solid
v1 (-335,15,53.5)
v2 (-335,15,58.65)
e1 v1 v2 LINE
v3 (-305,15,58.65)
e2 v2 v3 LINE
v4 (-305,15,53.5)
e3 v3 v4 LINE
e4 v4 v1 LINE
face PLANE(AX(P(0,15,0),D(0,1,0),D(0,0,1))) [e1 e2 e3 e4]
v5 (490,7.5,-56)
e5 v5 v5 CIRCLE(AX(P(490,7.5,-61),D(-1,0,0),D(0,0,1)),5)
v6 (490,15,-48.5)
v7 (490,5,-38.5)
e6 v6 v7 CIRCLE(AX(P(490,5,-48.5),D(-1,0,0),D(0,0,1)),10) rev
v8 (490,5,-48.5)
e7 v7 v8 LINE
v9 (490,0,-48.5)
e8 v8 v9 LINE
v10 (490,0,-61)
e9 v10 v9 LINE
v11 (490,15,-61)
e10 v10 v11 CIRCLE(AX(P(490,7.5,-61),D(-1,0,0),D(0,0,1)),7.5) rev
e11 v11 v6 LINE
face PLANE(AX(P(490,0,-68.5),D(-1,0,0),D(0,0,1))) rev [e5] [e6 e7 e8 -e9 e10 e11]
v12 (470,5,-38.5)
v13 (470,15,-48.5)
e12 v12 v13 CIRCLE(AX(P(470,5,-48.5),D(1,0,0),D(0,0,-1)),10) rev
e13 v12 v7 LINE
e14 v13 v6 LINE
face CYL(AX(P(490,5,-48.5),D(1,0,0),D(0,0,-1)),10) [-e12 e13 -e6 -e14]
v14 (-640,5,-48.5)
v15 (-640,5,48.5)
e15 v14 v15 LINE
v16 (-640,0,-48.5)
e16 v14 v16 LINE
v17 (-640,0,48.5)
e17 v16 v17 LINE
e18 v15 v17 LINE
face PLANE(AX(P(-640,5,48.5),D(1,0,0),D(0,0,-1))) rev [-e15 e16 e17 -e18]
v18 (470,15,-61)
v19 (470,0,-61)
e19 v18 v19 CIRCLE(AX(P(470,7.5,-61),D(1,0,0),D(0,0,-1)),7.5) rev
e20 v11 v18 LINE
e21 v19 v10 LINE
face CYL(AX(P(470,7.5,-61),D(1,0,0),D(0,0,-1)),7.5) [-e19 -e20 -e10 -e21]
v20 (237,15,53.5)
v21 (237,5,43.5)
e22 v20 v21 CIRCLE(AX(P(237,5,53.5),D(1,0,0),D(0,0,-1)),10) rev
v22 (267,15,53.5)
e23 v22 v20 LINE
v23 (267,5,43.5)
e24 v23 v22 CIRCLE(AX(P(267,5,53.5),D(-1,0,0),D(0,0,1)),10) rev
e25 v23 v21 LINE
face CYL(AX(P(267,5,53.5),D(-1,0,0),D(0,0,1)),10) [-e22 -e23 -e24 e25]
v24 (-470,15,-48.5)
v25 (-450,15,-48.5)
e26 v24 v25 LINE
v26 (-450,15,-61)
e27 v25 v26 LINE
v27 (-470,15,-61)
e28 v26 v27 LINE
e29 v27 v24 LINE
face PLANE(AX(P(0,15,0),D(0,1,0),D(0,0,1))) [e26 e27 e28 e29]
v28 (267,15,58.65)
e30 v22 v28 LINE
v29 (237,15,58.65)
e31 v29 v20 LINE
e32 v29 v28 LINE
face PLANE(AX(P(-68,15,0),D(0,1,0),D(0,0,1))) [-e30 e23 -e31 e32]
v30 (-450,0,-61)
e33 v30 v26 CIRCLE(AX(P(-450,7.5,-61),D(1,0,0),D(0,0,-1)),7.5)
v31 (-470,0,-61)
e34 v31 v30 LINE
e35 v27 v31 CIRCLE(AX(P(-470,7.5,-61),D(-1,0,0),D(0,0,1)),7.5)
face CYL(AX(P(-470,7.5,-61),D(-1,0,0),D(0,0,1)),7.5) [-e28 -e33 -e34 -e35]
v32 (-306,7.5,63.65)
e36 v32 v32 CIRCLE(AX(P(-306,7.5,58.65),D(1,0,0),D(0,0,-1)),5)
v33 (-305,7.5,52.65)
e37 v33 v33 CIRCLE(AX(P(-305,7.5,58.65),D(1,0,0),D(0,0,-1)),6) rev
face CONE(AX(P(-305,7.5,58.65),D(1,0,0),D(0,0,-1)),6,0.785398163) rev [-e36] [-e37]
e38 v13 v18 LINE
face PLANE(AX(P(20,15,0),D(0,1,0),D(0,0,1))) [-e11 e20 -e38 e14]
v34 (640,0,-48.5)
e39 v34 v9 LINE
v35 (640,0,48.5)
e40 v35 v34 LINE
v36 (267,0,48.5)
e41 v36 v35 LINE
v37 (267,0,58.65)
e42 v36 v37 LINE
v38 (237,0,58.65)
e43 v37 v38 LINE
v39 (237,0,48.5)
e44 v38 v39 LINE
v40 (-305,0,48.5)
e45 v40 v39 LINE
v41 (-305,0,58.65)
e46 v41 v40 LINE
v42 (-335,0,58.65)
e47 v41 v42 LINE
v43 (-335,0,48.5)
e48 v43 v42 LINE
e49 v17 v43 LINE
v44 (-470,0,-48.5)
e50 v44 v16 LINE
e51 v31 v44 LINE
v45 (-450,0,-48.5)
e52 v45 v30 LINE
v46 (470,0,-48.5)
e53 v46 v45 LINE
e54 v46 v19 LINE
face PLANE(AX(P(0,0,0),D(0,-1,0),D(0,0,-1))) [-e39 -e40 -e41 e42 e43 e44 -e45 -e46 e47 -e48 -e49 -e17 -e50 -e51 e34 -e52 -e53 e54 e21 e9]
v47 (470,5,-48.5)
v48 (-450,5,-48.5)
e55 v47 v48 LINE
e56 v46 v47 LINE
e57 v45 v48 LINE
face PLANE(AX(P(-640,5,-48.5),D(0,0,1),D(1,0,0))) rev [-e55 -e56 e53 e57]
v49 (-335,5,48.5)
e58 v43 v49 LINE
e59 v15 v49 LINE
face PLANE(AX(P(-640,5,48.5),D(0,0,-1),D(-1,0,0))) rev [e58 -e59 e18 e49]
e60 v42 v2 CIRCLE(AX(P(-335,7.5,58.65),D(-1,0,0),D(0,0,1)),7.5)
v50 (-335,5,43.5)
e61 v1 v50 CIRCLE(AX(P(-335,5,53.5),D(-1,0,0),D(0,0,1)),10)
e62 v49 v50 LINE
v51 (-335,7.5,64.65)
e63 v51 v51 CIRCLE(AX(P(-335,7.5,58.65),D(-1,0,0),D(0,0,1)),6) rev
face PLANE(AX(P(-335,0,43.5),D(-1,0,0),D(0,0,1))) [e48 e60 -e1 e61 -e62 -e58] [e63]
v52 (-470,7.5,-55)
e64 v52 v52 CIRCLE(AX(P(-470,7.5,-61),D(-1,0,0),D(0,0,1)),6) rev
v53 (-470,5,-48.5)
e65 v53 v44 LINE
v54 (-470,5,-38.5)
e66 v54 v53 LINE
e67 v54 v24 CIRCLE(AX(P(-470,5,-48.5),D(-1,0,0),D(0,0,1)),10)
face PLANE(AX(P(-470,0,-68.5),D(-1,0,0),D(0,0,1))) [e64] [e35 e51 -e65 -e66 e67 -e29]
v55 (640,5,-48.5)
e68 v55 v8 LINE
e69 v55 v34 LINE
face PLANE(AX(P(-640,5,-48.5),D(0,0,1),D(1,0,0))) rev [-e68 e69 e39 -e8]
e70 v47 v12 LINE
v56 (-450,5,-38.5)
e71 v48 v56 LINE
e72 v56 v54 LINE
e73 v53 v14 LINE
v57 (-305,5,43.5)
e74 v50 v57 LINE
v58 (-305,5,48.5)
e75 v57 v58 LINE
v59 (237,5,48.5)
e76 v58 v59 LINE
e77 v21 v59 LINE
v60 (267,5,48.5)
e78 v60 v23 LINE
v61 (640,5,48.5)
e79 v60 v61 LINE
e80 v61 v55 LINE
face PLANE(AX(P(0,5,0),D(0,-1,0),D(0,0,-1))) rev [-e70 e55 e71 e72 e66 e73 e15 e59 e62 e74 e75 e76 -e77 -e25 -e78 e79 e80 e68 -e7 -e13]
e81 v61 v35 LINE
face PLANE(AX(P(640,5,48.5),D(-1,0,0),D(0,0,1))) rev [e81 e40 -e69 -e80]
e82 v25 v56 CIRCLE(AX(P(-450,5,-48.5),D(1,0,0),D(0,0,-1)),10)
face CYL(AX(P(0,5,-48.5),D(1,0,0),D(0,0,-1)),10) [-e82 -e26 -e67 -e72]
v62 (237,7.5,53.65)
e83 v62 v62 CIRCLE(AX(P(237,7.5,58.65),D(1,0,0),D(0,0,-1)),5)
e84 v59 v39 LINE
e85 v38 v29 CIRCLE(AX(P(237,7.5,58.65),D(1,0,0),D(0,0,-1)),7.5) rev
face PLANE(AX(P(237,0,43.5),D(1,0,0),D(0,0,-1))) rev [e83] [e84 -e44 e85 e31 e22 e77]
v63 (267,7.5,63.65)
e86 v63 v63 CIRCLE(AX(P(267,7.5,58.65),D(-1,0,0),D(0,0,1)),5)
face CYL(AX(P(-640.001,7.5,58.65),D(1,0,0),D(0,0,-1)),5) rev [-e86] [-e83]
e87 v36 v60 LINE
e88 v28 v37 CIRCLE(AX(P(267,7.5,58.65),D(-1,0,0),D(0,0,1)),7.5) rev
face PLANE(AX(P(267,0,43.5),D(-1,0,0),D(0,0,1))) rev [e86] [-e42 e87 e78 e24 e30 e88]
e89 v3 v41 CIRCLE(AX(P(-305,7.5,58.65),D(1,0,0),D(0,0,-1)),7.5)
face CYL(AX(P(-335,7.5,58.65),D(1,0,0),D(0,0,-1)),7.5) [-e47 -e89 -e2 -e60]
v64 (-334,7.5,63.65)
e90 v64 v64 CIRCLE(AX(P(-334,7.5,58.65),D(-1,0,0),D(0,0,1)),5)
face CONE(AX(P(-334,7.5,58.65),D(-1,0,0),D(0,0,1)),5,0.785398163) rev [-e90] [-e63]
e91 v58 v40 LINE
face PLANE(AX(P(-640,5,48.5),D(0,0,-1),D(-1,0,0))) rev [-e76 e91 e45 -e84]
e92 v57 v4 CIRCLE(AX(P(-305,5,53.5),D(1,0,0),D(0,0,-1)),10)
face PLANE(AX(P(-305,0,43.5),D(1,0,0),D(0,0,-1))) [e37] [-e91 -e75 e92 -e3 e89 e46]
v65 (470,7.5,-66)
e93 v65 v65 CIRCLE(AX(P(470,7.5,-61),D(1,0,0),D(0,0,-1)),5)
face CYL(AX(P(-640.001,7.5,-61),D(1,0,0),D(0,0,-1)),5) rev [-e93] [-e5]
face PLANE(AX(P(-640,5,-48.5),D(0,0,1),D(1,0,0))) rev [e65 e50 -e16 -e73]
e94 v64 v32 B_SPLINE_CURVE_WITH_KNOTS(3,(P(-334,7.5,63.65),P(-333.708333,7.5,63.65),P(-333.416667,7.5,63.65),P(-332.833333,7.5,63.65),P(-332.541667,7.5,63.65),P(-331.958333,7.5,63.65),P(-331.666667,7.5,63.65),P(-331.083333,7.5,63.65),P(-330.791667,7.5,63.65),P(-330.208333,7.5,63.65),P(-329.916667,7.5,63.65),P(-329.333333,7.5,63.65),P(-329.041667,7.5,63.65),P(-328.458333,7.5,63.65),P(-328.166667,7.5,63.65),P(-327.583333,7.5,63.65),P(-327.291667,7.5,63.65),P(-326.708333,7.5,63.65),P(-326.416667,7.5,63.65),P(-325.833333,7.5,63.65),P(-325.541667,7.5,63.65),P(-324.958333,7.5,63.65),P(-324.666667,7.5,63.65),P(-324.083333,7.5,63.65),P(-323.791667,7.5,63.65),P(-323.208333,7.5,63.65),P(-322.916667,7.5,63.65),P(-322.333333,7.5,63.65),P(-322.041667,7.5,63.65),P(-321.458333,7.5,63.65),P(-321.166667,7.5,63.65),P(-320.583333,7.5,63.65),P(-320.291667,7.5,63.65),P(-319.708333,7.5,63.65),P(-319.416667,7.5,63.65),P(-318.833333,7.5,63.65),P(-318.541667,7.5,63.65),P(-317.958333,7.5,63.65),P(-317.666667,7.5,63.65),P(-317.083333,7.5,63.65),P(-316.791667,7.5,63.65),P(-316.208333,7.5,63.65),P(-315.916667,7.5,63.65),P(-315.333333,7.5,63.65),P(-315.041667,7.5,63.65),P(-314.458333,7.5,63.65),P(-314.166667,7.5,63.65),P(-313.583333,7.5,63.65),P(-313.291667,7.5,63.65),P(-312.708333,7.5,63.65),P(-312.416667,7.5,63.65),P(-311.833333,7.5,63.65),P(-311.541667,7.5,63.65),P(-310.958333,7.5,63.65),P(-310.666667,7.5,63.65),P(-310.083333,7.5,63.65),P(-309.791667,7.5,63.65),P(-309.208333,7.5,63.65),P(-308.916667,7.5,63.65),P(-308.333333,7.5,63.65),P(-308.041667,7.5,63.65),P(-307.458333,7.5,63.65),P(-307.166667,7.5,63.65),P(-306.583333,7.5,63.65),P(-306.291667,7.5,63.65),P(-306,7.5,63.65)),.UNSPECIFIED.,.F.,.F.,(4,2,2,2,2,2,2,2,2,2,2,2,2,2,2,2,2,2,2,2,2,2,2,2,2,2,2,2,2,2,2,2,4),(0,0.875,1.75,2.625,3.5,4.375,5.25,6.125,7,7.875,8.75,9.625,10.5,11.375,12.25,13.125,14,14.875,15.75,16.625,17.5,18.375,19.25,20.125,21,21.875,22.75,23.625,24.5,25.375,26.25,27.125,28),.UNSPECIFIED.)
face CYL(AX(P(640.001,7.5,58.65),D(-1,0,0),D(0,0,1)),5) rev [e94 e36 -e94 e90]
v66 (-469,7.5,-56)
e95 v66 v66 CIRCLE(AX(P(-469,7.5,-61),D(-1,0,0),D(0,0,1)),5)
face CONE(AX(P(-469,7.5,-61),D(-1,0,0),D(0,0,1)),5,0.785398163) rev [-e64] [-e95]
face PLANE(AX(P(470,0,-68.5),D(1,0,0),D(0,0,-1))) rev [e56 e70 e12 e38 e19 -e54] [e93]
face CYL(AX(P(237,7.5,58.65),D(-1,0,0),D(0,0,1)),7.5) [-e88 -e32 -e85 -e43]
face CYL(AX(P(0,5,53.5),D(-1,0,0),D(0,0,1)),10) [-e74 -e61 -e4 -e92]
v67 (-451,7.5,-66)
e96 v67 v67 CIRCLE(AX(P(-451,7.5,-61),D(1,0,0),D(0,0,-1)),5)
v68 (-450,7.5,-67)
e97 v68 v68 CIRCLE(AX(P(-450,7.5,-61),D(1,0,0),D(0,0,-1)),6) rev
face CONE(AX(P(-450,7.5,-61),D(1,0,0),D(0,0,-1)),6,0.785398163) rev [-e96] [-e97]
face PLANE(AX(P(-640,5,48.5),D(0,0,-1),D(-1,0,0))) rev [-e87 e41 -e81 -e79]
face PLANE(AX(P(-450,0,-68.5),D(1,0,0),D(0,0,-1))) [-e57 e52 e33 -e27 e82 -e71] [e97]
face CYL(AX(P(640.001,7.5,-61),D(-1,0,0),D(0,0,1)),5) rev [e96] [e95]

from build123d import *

# Parameters (mm, degrees)
SZKIC1_W                          = 1280
SZKIC1_H                          = 97
DODANIE_WYCI_GNI_CIE1_DEPTH       = 5
DODANIE_WYCI_GNI_CIE2_START       = -5
SZKIC2_W                          = 20
SZKIC2_H                          = 30
DODANIE_WYCI_GNI_CIE2_DEPTH       = 15
ZAOKR_GLENIE2_RADIUS              = 7.5
ZAOKR_GLENIE2_LENGTH              = 20
WYTNIJ_WYCI_GNI_CIE1_REACH        = 1114.213
SZKIC3_R                          = 5
DODANIE_WYCI_GNI_CIE3_START       = -5
SZKIC4_W                          = 30
SZKIC4_H                          = 22.65
DODANIE_WYCI_GNI_CIE3_DEPTH       = 15
ZAOKR_GLENIE3_R                   = 10
ZAOKR_GLENIE4_RADIUS              = 7.5
ZAOKR_GLENIE4_LENGTH              = 30
WYTNIJ_WYCI_GNI_CIE2_REACH        = 979.518
SZKIC5_R                          = 5
SFAZOWANIE1_SIZE                  = 1
ZAOKR_GLENIE5_R                   = 10
ZAOKR_GLENIE4_OF_LUSTRO2_2_RADIUS = 7.5
ZAOKR_GLENIE4_OF_LUSTRO2_2_LENGTH = 30
ZAOKR_GLENIE5_OF_LUSTRO2_R        = 10
ZAOKR_GLENIE2_OF_LUSTRO3_2_RADIUS = 7.5
ZAOKR_GLENIE2_OF_LUSTRO3_2_LENGTH = 20
ZAOKR_GLENIE3_OF_LUSTRO3_R        = 10


with BuildPart() as part:
    # Szkic1 → Dodanie-wyciągnięcie1 (new body)
    with BuildSketch(Plane(origin=(0, 0, 0), x_dir=(1, 0, 0), z_dir=(0, 1, 0))):
        Rectangle(SZKIC1_W, SZKIC1_H)
    extrude(amount=DODANIE_WYCI_GNI_CIE1_DEPTH)

    # Szkic2 → Dodanie-wyciągnięcie2 (add)
    with BuildSketch(Plane(origin=(0, 5, 0), x_dir=(1, 0, 0), z_dir=(0, 1, 0)).offset(DODANIE_WYCI_GNI_CIE2_START)):
        with Locations((-460, 53.5)):
            Rectangle(SZKIC2_W, SZKIC2_H)
    dodanie_wyci_gni_cie2 = extrude(amount=DODANIE_WYCI_GNI_CIE2_DEPTH)

    # Zaokrąglenie2: full round fillet: the end face becomes a half cylinder, R = half its width
    zaokr_glenie2_face = Plane((-460, 7.5, -68.5), x_dir=(-1, 0, 0), z_dir=(0, 0, -1))  # on the end face: x along it, z out of the body
    zaokr_glenie2_slab = zaokr_glenie2_face.offset(-ZAOKR_GLENIE2_RADIUS / 2) * Box(ZAOKR_GLENIE2_LENGTH, 2 * ZAOKR_GLENIE2_RADIUS, ZAOKR_GLENIE2_RADIUS, mode=Mode.PRIVATE)  # the body's end, R deep
    zaokr_glenie2_round = Plane((-460, 7.5, -61), x_dir=(0, 0, -1), z_dir=(-1, 0, 0)) * Cylinder(ZAOKR_GLENIE2_RADIUS, ZAOKR_GLENIE2_LENGTH, mode=Mode.PRIVATE)  # its axis R under the face
    add(zaokr_glenie2_slab - zaokr_glenie2_round, mode=Mode.SUBTRACT)

    # Szkic3 → Wytnij-wyciągnięcie1 (cut, up to next)
    with BuildSketch(Plane.ZY.offset(470), mode=Mode.PRIVATE) as wytnij_wyci_gni_cie1_sk1:
        with Locations((-61, 7.5)):
            Circle(SZKIC3_R)
    wytnij_wyci_gni_cie1_tool1 = extrude(wytnij_wyci_gni_cie1_sk1.sketch, amount=-WYTNIJ_WYCI_GNI_CIE1_REACH, mode=Mode.PRIVATE) & part.part
    wytnij_wyci_gni_cie1 = wytnij_wyci_gni_cie1_tool1.solids().sort_by_distance((-470, 7.5, -61))[0]
    add(wytnij_wyci_gni_cie1, mode=Mode.SUBTRACT)

    # Szkic4 → Dodanie-wyciągnięcie3 (add)
    with BuildSketch(Plane(origin=(0, 5, 0), x_dir=(1, 0, 0), z_dir=(0, 1, 0)).offset(DODANIE_WYCI_GNI_CIE3_START)):
        with Locations((-320, -54.825)):
            Rectangle(SZKIC4_W, SZKIC4_H)
    dodanie_wyci_gni_cie3 = extrude(amount=DODANIE_WYCI_GNI_CIE3_DEPTH)

    # Zaokrąglenie3
    zaokr_glenie3_edges = [part.edges().sort_by_distance(p)[0] for p in [
        (-460, 15, -38.5),
    ]]
    fillet(zaokr_glenie3_edges, radius=ZAOKR_GLENIE3_R - 0.0001)  # a hair under: the kernel refuses the full size

    # Zaokrąglenie4: full round fillet: the end face becomes a half cylinder, R = half its width
    zaokr_glenie4_face = Plane((-320, 7.5, 66.15), x_dir=(1, 0, 0), z_dir=(0, 0, 1))  # on the end face: x along it, z out of the body
    zaokr_glenie4_slab = zaokr_glenie4_face.offset(-ZAOKR_GLENIE4_RADIUS / 2) * Box(ZAOKR_GLENIE4_LENGTH, 2 * ZAOKR_GLENIE4_RADIUS, ZAOKR_GLENIE4_RADIUS, mode=Mode.PRIVATE)  # the body's end, R deep
    zaokr_glenie4_round = Plane((-320, 7.5, 58.65), x_dir=(0, 0, 1), z_dir=(1, 0, 0)) * Cylinder(ZAOKR_GLENIE4_RADIUS, ZAOKR_GLENIE4_LENGTH, mode=Mode.PRIVATE)  # its axis R under the face
    add(zaokr_glenie4_slab - zaokr_glenie4_round, mode=Mode.SUBTRACT)

    # Szkic5 → Wytnij-wyciągnięcie2 (cut, up to next)
    with BuildSketch(Plane.ZY.offset(335), mode=Mode.PRIVATE) as wytnij_wyci_gni_cie2_sk1:
        with Locations((58.65, 7.5)):
            Circle(SZKIC5_R)
    wytnij_wyci_gni_cie2_tool1 = extrude(wytnij_wyci_gni_cie2_sk1.sketch, amount=-WYTNIJ_WYCI_GNI_CIE2_REACH, mode=Mode.PRIVATE) & part.part
    wytnij_wyci_gni_cie2 = wytnij_wyci_gni_cie2_tool1.solids().sort_by_distance((-335, 7.5, 58.65))[0]
    add(wytnij_wyci_gni_cie2, mode=Mode.SUBTRACT)

    # Sfazowanie1
    sfazowanie1_edges = [part.edges().sort_by_distance(p)[0] for p in [
        (-450, 7.5, -66),
        (-470, 7.5, -66),
        (-305, 7.5, 53.65),
        (-335, 7.5, 53.65),
    ]]
    chamfer(sfazowanie1_edges, length=SFAZOWANIE1_SIZE)

    # Zaokrąglenie5
    zaokr_glenie5_edges = [part.edges().sort_by_distance(p)[0] for p in [
        (-320, 15, 43.5),
    ]]
    fillet(zaokr_glenie5_edges, radius=ZAOKR_GLENIE5_R - 0.0001)  # a hair under: the kernel refuses the full size

    # Lustro2: Dodanie-wyciągnięcie3, Wytnij-wyciągnięcie2 across plane
    add(dodanie_wyci_gni_cie3.mirror(Plane(origin=(-34, 0, 0), x_dir=(0, 0, 1), z_dir=(1, 0, 0))))
    add(wytnij_wyci_gni_cie2.mirror(Plane(origin=(-34, 0, 0), x_dir=(0, 0, 1), z_dir=(1, 0, 0))), mode=Mode.SUBTRACT)

    # Zaokrąglenie4 of Lustro2 2: full round fillet: the end face becomes a half cylinder, R = half its width
    zaokr_glenie4_of_lustro2_2_face = Plane((252, 7.5, 66.15), x_dir=(-1, 0, 0), z_dir=(0, 0, 1))  # on the end face: x along it, z out of the body
    zaokr_glenie4_of_lustro2_2_slab = zaokr_glenie4_of_lustro2_2_face.offset(-ZAOKR_GLENIE4_OF_LUSTRO2_2_RADIUS / 2) * Box(ZAOKR_GLENIE4_OF_LUSTRO2_2_LENGTH, 2 * ZAOKR_GLENIE4_OF_LUSTRO2_2_RADIUS, ZAOKR_GLENIE4_OF_LUSTRO2_2_RADIUS, mode=Mode.PRIVATE)  # the body's end, R deep
    zaokr_glenie4_of_lustro2_2_round = Plane((252, 7.5, 58.65), x_dir=(0, 0, 1), z_dir=(-1, 0, 0)) * Cylinder(ZAOKR_GLENIE4_OF_LUSTRO2_2_RADIUS, ZAOKR_GLENIE4_OF_LUSTRO2_2_LENGTH, mode=Mode.PRIVATE)  # its axis R under the face
    add(zaokr_glenie4_of_lustro2_2_slab - zaokr_glenie4_of_lustro2_2_round, mode=Mode.SUBTRACT)

    # Zaokrąglenie5 of Lustro2
    zaokr_glenie5_of_lustro2_edges = [part.edges().sort_by_distance(p)[0] for p in [
        (252, 15, 43.5),
    ]]
    fillet(zaokr_glenie5_of_lustro2_edges, radius=ZAOKR_GLENIE5_OF_LUSTRO2_R - 0.0001)  # a hair under: the kernel refuses the full size

    # Lustro3: Dodanie-wyciągnięcie2, Wytnij-wyciągnięcie1 across plane
    add(dodanie_wyci_gni_cie2.mirror(Plane(origin=(10, 0, 0), x_dir=(0, 0, 1), z_dir=(1, 0, 0))))
    add(wytnij_wyci_gni_cie1.mirror(Plane(origin=(10, 0, 0), x_dir=(0, 0, 1), z_dir=(1, 0, 0))), mode=Mode.SUBTRACT)

    # Zaokrąglenie2 of Lustro3 2: full round fillet: the end face becomes a half cylinder, R = half its width
    zaokr_glenie2_of_lustro3_2_face = Plane((480, 7.5, -68.5), x_dir=(1, 0, 0), z_dir=(0, 0, -1))  # on the end face: x along it, z out of the body
    zaokr_glenie2_of_lustro3_2_slab = zaokr_glenie2_of_lustro3_2_face.offset(-ZAOKR_GLENIE2_OF_LUSTRO3_2_RADIUS / 2) * Box(ZAOKR_GLENIE2_OF_LUSTRO3_2_LENGTH, 2 * ZAOKR_GLENIE2_OF_LUSTRO3_2_RADIUS, ZAOKR_GLENIE2_OF_LUSTRO3_2_RADIUS, mode=Mode.PRIVATE)  # the body's end, R deep
    zaokr_glenie2_of_lustro3_2_round = Plane((480, 7.5, -61), x_dir=(0, 0, -1), z_dir=(1, 0, 0)) * Cylinder(ZAOKR_GLENIE2_OF_LUSTRO3_2_RADIUS, ZAOKR_GLENIE2_OF_LUSTRO3_2_LENGTH, mode=Mode.PRIVATE)  # its axis R under the face
    add(zaokr_glenie2_of_lustro3_2_slab - zaokr_glenie2_of_lustro3_2_round, mode=Mode.SUBTRACT)

    # Zaokrąglenie3 of Lustro3
    zaokr_glenie3_of_lustro3_edges = [part.edges().sort_by_distance(p)[0] for p in [
        (480, 15, -38.5),
    ]]
    fillet(zaokr_glenie3_of_lustro3_edges, radius=ZAOKR_GLENIE3_OF_LUSTRO3_R - 0.0001)  # a hair under: the kernel refuses the full size


solid = part.part
